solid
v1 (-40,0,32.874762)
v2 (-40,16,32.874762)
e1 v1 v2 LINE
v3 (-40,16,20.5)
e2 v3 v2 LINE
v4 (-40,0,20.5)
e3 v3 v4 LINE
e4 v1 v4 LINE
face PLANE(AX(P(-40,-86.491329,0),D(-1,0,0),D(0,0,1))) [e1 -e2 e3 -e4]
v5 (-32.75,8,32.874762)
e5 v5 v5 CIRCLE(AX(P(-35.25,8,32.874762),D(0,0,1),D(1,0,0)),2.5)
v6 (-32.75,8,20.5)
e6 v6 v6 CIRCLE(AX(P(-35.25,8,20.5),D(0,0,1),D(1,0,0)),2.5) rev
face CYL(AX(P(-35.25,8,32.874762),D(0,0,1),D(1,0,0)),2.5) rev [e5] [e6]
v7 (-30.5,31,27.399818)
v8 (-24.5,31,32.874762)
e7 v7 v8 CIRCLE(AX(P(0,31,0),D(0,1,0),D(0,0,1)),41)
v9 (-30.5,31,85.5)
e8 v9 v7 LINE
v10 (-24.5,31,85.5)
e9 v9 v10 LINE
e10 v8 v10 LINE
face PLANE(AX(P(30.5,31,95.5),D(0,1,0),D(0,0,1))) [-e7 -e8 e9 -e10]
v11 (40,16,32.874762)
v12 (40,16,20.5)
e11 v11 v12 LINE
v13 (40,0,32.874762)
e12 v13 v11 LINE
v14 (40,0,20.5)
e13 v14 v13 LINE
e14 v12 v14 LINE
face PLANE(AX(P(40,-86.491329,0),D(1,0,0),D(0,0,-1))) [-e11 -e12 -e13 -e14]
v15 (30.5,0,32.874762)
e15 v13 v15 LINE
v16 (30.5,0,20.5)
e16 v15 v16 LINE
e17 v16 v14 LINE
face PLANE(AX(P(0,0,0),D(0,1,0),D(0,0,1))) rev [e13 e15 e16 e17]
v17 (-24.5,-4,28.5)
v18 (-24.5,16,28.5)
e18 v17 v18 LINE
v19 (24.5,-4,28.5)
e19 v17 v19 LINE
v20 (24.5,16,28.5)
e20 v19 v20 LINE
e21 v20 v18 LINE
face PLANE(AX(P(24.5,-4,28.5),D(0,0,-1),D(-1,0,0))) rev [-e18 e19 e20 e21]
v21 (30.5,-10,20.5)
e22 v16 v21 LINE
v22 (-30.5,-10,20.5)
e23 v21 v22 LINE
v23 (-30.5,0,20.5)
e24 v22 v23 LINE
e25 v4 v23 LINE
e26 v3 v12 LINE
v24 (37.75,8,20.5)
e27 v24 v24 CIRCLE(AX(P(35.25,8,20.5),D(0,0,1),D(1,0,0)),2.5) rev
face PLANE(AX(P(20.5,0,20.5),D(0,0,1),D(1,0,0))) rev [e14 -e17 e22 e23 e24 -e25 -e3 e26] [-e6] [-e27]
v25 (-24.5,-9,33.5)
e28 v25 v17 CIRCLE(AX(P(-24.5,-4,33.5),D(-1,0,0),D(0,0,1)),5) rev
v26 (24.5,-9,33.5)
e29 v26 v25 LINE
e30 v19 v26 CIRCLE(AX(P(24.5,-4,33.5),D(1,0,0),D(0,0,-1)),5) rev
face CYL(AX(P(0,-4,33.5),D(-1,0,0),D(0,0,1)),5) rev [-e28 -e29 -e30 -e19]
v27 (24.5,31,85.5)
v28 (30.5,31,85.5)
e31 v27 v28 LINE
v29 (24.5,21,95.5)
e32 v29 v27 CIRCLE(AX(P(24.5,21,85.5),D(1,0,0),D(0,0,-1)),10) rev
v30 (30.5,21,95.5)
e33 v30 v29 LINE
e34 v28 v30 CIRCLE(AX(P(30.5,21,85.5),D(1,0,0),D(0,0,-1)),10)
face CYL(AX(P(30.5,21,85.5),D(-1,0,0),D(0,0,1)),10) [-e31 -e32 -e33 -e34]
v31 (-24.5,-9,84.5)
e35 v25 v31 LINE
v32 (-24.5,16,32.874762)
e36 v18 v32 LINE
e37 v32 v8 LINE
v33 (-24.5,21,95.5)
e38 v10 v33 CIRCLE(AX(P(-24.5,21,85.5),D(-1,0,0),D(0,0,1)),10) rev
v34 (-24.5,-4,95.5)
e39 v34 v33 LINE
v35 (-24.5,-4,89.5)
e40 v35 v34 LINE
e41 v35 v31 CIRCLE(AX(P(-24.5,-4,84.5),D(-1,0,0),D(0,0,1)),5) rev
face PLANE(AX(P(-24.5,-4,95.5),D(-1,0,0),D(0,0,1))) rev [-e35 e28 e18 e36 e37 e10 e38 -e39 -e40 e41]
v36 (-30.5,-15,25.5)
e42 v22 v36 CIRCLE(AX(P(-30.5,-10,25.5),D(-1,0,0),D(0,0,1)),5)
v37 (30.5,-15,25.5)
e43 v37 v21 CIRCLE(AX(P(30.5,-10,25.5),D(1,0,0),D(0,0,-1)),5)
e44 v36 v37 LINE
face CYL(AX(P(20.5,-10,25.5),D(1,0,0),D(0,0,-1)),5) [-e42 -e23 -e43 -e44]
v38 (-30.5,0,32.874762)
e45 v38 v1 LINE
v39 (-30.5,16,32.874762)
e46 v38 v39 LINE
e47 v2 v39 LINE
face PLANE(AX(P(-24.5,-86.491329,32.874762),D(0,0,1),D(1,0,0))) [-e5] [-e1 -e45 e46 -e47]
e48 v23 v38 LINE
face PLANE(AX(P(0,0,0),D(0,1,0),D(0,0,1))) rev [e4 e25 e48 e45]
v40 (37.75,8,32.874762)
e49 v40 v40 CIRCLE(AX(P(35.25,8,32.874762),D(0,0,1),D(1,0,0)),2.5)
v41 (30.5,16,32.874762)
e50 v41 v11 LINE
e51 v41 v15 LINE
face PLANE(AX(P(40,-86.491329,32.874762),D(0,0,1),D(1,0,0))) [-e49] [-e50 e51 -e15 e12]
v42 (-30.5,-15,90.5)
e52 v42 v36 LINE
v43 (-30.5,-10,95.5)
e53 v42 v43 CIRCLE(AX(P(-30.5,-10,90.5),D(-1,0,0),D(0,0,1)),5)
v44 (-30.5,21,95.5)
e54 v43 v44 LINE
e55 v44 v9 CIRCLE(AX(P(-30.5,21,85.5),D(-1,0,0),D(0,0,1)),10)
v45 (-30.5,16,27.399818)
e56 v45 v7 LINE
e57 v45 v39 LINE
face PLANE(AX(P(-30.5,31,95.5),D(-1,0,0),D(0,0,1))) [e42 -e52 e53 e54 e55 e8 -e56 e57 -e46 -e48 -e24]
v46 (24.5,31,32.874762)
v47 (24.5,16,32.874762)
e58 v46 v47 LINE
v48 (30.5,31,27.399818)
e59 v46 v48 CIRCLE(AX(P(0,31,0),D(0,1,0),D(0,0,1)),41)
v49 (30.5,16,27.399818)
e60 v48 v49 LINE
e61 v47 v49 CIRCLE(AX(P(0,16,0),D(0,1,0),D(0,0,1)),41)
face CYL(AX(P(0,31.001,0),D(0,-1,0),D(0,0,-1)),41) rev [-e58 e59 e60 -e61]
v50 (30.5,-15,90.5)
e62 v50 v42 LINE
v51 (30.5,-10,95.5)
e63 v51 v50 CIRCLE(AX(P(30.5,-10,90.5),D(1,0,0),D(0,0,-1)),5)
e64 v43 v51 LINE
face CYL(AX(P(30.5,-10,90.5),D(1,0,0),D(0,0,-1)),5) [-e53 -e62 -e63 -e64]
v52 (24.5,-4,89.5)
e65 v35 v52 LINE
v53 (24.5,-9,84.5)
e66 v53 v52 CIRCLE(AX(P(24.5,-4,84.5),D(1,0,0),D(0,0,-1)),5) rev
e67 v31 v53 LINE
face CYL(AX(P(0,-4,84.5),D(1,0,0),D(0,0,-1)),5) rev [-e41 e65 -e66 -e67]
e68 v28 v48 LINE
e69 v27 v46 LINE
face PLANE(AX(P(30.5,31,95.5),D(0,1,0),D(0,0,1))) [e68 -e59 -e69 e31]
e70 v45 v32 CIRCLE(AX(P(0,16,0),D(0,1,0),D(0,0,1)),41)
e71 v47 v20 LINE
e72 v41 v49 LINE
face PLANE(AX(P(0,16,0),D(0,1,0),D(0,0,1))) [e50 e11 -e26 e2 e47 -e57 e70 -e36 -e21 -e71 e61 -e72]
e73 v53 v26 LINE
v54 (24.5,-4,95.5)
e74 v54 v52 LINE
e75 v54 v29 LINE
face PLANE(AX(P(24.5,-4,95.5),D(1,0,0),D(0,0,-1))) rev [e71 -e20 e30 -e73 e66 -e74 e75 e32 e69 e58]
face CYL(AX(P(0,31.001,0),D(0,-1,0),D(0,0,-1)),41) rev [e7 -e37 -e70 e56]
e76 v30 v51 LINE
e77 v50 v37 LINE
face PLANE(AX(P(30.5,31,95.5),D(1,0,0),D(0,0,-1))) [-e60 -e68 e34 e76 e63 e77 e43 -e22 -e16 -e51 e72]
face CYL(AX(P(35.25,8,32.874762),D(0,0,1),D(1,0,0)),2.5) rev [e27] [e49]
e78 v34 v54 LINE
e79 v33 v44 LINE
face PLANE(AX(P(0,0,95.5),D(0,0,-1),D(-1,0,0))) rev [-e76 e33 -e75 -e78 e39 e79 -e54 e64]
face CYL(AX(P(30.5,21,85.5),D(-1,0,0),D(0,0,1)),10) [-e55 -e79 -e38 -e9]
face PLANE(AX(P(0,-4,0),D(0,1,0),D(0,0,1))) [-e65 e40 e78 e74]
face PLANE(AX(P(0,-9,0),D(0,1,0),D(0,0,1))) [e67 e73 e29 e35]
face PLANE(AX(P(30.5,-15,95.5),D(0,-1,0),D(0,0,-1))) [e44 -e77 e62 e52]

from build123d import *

# Parameters (mm, degrees)
SKETCH1_R                 = 40
BOSS_EXTRUDE1_DEPTH       = 16
SKETCH2_W                 = 41
SKETCH2_H                 = 41
CUT_EXTRUDE1_DEPTH        = 59.787753827
SKETCH13_W                = 61
SKETCH13_H                = 46
BOSS_EXTRUDE4_DEPTH       = 75
SKETCH14_W                = 49
SKETCH14_H                = 67
CUT_EXTRUDE2_DEPTH        = 35
SKETCH15_W                = 49
SKETCH15_H                = 61
CUT_EXTRUDE3_DEPTH        = 5
FILLET1_R                 = 10
FILLET2_R                 = 5
CUT_EXTRUDE5_REACH        = 110.08
SKETCH17_R                = 41
BOSS_EXTRUDE5_DEPTH       = 16
CUT_EXTRUDE4_DEPTH        = 118.224144271
CUT_EXTRUDE4_DEPTH_BACK   = 118.224144271
SKETCH16_R                = 3
F_5_0MM_DOWEL_HOLE1_D     = 5
F_5_0MM_DOWEL_HOLE1_DEPTH = 25
F_5_0MM_DOWEL_HOLE1_TIP   = 1.502151548
CUT_EXTRUDE7_DEPTH        = 123.446927311
CUT_EXTRUDE7_DEPTH_BACK   = 123.446927311
SKETCH22_W                = 41
SKETCH22_H                = 41


with BuildPart() as part:
    # Sketch1 → Boss-Extrude1 (new body)
    with BuildSketch(Plane(origin=(0, 0, 0), x_dir=(1, 0, 0), z_dir=(0, 1, 0))):
        with Locations(Location((0, 0, 0), (0, 0, 270))):
            Circle(SKETCH1_R)
    extrude(amount=BOSS_EXTRUDE1_DEPTH)

    # Sketch2 → Cut-Extrude1 (cut, through all)
    with BuildSketch(Plane(origin=(0, 16, 0), x_dir=(1, 0, 0), z_dir=(0, 1, 0))):
        Rectangle(SKETCH2_W, SKETCH2_H)
    extrude(amount=-CUT_EXTRUDE1_DEPTH, mode=Mode.SUBTRACT)

    # Sketch13 → Boss-Extrude4 (add)
    with BuildSketch(Plane(origin=(0, 0, 20.5), x_dir=(-1, 0, 0), z_dir=(0, 0, -1))):
        with Locations((0, 8)):
            Rectangle(SKETCH13_W, SKETCH13_H)
    extrude(amount=-BOSS_EXTRUDE4_DEPTH)

    # Sketch14 → Cut-Extrude2 (cut)
    with BuildSketch(Plane(origin=(0, 31, 0), x_dir=(1, 0, 0), z_dir=(0, 1, 0))):
        with Locations((0, -62)):
            Rectangle(SKETCH14_W, SKETCH14_H)
    extrude(amount=-CUT_EXTRUDE2_DEPTH, mode=Mode.SUBTRACT)

    # Sketch15 → Cut-Extrude3 (cut)
    with BuildSketch(Plane(origin=(0, -4, 0), x_dir=(1, 0, 0), z_dir=(0, 1, 0))):
        with Locations((0, -59)):
            Rectangle(SKETCH15_W, SKETCH15_H)
    extrude(amount=-CUT_EXTRUDE3_DEPTH, mode=Mode.SUBTRACT)

    # Fillet1
    fillet1_edges = [part.edges().sort_by_distance(p)[0] for p in [
        (-27.5, 31, 95.5),
        (27.5, 31, 95.5),
    ]]
    fillet(fillet1_edges, radius=FILLET1_R)

    # Fillet2
    fillet2_edges = [part.edges().sort_by_distance(p)[0] for p in [
        (0, -9, 89.5),
        (0, -15, 95.5),
        (0, -15, 20.5),
        (0, -9, 28.5),
    ]]
    fillet(fillet2_edges, radius=FILLET2_R - 0.0001)  # a hair under: the kernel refuses the full size

    # Sketch17 → Cut-Extrude5 (cut, up to next)
    with BuildSketch(Plane(origin=(0, 16, 0), x_dir=(1, 0, 0), z_dir=(0, 1, 0)), mode=Mode.PRIVATE) as cut_extrude5_sk1:
        Circle(SKETCH17_R)
    cut_extrude5_tool1 = extrude(cut_extrude5_sk1.sketch, amount=CUT_EXTRUDE5_REACH, mode=Mode.PRIVATE) & part.part
    add(cut_extrude5_tool1.solids().sort_by_distance((0, 16, 0))[0], mode=Mode.SUBTRACT)

    # Sketch18 → Boss-Extrude5 (add)
    with BuildSketch(Plane(origin=(0, 16, 0), x_dir=(1, 0, 0), z_dir=(0, 1, 0))):
        Polygon((20.5, 0), (20.5, -20.5), (-20.5, -20.5), (-20.5, 0), (-40, 0), (-40, -32.874762357), (-24.5, -32.874762357), (-24.5, -28.5), (24.5, -28.5), (24.5, -32.874762357), (40, -32.874762357), (40, 0), align=None)
    extrude(amount=-BOSS_EXTRUDE5_DEPTH)

    # Sketch16 → Cut-Extrude4 (cut, two sides: drawn at the far end of the back side and taken through both)
    with BuildSketch(Plane.ZY.offset(-20.5).offset(-CUT_EXTRUDE4_DEPTH_BACK)):
        with Locations(Location((0, 8, 0), (0, 0, 270))):
            Circle(SKETCH16_R)
    extrude(amount=CUT_EXTRUDE4_DEPTH + CUT_EXTRUDE4_DEPTH_BACK, mode=Mode.SUBTRACT)

    # Ø5.0mm Dowel Hole1
    with Locations(Plane(origin=(-35.25, 8, 32.874762357), x_dir=(1, 0, 0), z_dir=(0, 0, 1))):
        with Locations((0, 0), (70.5, 0)):
            Hole(F_5_0MM_DOWEL_HOLE1_D / 2, depth=F_5_0MM_DOWEL_HOLE1_DEPTH)
            with Locations((0, 0, -(F_5_0MM_DOWEL_HOLE1_DEPTH + F_5_0MM_DOWEL_HOLE1_TIP / 2))):  # 118° drill point
                Cone(0, F_5_0MM_DOWEL_HOLE1_D / 2, F_5_0MM_DOWEL_HOLE1_TIP, mode=Mode.SUBTRACT)

    # Sketch22 → Cut-Extrude7 (cut, two sides: drawn at the far end of the back side and taken through both)
    with BuildSketch(Plane(origin=(0, 16, -16), x_dir=(1, 0, 0), z_dir=(0, -1, 0)).offset(-CUT_EXTRUDE7_DEPTH_BACK)):
        with Locations((0, 16)):
            Rectangle(SKETCH22_W, SKETCH22_H)
        with BuildLine():
            Line((40, 16), (40, 36.5))
            Line((40, 36.5), (20.5, 36.5))
            Line((20.5, 36.5), (20.5, -4.5))
            Line((20.5, -4.5), (-20.5, -4.5))
            Line((-20.5, -4.5), (-20.5, 36.5))
            Line((-20.5, 36.5), (-40, 36.5))
            Line((-40, 36.5), (-40, 16))
            ThreePointArc((-40, 16), (-28.284271226, -12.284271269), (6.1e-08, -24))
            ThreePointArc((6.1e-08, -24), (28.284271269, -12.284271226), (40, 16))
        make_face()
        with BuildLine():
            Line((40, -24), (40, 16))
            ThreePointArc((40, 16), (28.284271269, -12.284271226), (6.1e-08, -24))
            Line((6.1e-08, -24), (40, -24))
        make_face()
        with BuildLine():
            Line((-40, -24), (6.1e-08, -24))
            ThreePointArc((6.1e-08, -24), (-28.284271226, -12.284271269), (-40, 16))
            Line((-40, 16), (-40, -24))
        make_face()
    extrude(amount=CUT_EXTRUDE7_DEPTH + CUT_EXTRUDE7_DEPTH_BACK, mode=Mode.SUBTRACT)


solid = part.part
